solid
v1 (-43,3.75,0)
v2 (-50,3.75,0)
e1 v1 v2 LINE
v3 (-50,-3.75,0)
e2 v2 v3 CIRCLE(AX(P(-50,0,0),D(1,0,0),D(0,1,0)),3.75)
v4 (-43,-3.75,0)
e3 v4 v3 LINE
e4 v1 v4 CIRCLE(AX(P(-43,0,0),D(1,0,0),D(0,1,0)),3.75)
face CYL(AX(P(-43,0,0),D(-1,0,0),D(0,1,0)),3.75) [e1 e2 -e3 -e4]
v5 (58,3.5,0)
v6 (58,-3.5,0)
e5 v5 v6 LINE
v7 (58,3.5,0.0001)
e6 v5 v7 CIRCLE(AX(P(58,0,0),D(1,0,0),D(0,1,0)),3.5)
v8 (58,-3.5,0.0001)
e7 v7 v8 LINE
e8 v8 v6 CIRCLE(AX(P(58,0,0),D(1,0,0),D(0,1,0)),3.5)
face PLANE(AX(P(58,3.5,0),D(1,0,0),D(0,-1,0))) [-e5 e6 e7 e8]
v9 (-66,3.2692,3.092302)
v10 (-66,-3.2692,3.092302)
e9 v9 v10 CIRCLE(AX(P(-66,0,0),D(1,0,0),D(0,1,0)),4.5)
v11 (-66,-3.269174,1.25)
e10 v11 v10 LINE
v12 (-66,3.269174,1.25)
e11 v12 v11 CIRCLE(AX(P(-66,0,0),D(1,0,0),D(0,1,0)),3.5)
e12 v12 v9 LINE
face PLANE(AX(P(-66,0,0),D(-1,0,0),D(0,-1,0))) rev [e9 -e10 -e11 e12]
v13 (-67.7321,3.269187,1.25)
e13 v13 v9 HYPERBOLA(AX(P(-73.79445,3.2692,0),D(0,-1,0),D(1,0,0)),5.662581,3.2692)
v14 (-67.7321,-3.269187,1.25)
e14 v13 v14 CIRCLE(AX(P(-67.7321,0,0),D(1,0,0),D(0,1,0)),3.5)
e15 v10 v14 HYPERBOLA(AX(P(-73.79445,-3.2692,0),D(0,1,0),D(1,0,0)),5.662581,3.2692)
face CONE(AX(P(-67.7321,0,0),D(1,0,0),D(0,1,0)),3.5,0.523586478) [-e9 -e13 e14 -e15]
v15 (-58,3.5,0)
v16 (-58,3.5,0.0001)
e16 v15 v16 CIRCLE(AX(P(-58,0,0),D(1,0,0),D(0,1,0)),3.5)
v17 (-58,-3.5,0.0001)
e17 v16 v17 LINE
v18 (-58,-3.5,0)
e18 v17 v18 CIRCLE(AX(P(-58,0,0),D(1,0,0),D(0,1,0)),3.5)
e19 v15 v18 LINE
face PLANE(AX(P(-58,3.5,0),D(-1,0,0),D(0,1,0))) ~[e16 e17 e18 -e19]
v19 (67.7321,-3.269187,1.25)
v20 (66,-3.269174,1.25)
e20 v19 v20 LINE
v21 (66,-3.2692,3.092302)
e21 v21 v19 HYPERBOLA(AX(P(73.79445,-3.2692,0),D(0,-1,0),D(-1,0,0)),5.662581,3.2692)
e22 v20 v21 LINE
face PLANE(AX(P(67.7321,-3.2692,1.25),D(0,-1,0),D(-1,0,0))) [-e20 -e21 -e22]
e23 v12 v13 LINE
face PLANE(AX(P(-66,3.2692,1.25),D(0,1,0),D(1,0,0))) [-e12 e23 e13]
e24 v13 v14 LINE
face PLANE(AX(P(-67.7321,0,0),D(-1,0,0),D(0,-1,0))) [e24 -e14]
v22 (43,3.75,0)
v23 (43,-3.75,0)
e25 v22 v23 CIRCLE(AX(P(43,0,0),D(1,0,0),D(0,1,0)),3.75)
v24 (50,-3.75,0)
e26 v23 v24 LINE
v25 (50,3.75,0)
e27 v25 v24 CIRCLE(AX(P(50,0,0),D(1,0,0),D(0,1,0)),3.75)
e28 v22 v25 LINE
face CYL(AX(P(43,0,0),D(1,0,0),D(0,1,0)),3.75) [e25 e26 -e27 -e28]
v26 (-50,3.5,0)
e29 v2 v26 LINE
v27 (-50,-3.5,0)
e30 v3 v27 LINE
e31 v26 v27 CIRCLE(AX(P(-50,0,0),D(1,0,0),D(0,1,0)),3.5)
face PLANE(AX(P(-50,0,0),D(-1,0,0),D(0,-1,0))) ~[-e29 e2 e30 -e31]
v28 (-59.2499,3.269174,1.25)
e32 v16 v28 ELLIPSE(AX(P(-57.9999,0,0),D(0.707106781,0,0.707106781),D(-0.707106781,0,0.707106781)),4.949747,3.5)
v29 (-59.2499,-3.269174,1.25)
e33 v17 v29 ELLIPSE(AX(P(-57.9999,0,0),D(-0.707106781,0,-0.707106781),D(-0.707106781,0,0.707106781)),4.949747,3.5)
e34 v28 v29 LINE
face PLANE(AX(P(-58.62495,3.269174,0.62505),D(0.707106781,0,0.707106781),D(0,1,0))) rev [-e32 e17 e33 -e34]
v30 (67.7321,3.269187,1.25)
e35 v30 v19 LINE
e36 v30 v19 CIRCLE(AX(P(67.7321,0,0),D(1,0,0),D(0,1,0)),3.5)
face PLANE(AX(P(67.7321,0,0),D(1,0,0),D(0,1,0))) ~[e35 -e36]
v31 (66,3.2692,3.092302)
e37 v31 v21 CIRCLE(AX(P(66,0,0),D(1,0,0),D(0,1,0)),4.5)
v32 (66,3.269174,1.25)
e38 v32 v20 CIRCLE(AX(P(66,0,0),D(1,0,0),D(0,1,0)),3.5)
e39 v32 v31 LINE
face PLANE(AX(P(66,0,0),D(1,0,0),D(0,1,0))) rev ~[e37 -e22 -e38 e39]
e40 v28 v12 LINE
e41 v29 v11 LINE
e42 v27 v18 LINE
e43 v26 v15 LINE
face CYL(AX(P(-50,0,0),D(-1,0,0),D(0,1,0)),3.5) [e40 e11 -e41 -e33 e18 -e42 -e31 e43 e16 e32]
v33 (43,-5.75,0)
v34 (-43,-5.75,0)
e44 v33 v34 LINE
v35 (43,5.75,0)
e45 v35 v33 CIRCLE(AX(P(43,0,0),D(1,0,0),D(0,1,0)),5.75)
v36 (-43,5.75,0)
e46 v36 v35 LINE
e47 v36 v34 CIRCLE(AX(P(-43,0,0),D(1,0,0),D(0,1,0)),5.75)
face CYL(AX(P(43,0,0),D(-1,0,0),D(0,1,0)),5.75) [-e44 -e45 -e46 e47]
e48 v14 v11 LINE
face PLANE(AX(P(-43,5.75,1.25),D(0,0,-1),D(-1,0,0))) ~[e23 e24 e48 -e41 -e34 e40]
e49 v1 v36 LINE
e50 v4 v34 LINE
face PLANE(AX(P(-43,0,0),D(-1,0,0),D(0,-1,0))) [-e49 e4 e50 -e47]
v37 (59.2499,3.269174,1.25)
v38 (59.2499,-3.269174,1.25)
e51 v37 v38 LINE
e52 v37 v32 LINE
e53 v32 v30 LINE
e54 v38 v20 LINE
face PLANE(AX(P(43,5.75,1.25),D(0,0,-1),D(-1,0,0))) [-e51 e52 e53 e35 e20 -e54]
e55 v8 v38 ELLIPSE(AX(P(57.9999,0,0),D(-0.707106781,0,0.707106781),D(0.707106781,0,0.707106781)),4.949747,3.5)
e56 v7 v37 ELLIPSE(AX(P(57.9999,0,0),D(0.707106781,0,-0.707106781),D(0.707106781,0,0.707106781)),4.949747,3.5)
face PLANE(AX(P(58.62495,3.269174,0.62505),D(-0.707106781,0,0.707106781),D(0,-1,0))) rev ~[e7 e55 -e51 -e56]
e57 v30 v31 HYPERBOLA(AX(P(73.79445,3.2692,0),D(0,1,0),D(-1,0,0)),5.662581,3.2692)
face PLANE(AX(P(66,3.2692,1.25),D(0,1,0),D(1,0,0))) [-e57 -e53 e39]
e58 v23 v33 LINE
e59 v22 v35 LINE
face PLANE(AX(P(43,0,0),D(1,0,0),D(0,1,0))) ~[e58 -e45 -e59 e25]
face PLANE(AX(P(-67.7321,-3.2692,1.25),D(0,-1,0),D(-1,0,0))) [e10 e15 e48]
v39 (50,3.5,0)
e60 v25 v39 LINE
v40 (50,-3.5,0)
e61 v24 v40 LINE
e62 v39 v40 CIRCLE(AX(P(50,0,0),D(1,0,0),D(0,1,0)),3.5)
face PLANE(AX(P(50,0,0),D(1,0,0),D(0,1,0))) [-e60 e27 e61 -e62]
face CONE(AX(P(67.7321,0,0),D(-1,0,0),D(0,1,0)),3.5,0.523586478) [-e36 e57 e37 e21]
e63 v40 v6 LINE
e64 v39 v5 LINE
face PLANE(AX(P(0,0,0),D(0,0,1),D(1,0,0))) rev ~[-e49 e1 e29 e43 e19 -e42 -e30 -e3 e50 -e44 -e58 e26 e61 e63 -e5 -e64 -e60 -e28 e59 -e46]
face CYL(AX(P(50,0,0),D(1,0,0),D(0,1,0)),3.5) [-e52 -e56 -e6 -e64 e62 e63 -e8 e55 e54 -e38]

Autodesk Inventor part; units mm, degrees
ref_plane "YZ Plane" through (0, 0, 0) normal (1, 0, 0) x (0, 1, 0)
ref_plane "XZ Plane" through (0, 0, 0) normal (0, 1, 0) x (-1, 0, 0)
ref_plane "XY Plane" through (0, 0, 0) normal (0, 0, 1) x (1, 0, 0)
sketch "Sketch1" plane through (0, 0, 0) normal (0, 0, 1) x (1, 0, 0)
  line L0 (43, 5.75) -> (0, 5.75)
  line L1 (0, 5.75) -> (0, 0)
  line L2 (43, 3.75) -> (43, 5.75)
  line L3 (0, 0) -> (67.7321, 0)
  line L4 (43, 3.75) -> (50, 3.75)
  line L5 (50, 3.75) -> (50, 3.5)
  line L6 (50, 3.5) -> (66, 3.5)
  line L7 (67.7321, 0) -> (67.7321, 3.5)
  line L8 (67.7321, 3.5) -> (66, 4.5)
  line L9 (66, 4.5) -> (66, 3.5)
  line L10 (66, 3.5) -> (67.7321, 3.5) construction
  dimension "d5" = 43
  dimension "d6" = 3.5
  dimension "d7" = 3.75
  dimension "d8" = 7
  dimension "d9" = 120
  dimension "d10" = 1
  dimension "d11" = 66
  dimension "d12" = 5.75
revolve "Revolution1" add sketch "Sketch1" angle 180 about axis through (0, 0, 0) along (1, 0, 0)
sketch "Sketch2" plane through (43, 5.75, 0) normal (0, 0, -1) x (-1, 0, 0)
  line L0 (-23, -1.25) -> (-23, -2.25) projected
  line L1 (-24.7321, -2.25) -> (-23, -1.25) projected
  line L2 (-24.7321, -2.25) -> (-24.7321, -9.25) projected
  line L3 (-24.7321, -9.25) -> (-23, -10.25) projected
  line L4 (-23, -10.25) -> (-23, -9.25) projected
  line L5 (-23, -2.25) -> (-15, -2.25)
  line L6 (-15, -2.25) -> (-15, -9.25)
  line L7 (-15, -9.25) -> (-23, -9.25)
  dimension "d14" = 8
extrude "Extrusion1" cut sketch "Sketch2" against normal blind 1.25
chamfer "Chamfer1" distance 1.25 angle 45 1 edges at (58, 0, 1.25)
sketch "Sketch3" plane through (43, 5.75, 1.25) normal (0, 0, -1) x (-1, 0, 0)
  line L0 (-23, -1.4271) -> (-23, -2.4808) projected
  spline S0 degree 2 poles (-24.7321, -2.4808) (-23.9862, -2.0198) (-23, -1.4271) knots 0 0 0 1 1 1 weights 1 1.008789 1 projected
  spline S1 degree 2 poles (-23, -10.0729) (-23.9862, -9.4802) (-24.7321, -9.0192) knots 0 0 0 1 1 1 weights 1 1.008789 1 projected
  line L1 (-23, -9.0192) -> (-23, -10.0729) projected
  line L2 (-23, -2.4808) -> (-24.7321, -2.4808)
  line L3 (-24.7321, -9.0192) -> (-23, -9.0192)
  point P0 (43, -5.75)
extrude "Extrusion2" cut sketch "Sketch3" against normal blind 2
mirror "Mirror1" about plane through (0, 5.75, 0) normal (-1, 0, 0)
properties part number "SpoolHandle-axis1"
